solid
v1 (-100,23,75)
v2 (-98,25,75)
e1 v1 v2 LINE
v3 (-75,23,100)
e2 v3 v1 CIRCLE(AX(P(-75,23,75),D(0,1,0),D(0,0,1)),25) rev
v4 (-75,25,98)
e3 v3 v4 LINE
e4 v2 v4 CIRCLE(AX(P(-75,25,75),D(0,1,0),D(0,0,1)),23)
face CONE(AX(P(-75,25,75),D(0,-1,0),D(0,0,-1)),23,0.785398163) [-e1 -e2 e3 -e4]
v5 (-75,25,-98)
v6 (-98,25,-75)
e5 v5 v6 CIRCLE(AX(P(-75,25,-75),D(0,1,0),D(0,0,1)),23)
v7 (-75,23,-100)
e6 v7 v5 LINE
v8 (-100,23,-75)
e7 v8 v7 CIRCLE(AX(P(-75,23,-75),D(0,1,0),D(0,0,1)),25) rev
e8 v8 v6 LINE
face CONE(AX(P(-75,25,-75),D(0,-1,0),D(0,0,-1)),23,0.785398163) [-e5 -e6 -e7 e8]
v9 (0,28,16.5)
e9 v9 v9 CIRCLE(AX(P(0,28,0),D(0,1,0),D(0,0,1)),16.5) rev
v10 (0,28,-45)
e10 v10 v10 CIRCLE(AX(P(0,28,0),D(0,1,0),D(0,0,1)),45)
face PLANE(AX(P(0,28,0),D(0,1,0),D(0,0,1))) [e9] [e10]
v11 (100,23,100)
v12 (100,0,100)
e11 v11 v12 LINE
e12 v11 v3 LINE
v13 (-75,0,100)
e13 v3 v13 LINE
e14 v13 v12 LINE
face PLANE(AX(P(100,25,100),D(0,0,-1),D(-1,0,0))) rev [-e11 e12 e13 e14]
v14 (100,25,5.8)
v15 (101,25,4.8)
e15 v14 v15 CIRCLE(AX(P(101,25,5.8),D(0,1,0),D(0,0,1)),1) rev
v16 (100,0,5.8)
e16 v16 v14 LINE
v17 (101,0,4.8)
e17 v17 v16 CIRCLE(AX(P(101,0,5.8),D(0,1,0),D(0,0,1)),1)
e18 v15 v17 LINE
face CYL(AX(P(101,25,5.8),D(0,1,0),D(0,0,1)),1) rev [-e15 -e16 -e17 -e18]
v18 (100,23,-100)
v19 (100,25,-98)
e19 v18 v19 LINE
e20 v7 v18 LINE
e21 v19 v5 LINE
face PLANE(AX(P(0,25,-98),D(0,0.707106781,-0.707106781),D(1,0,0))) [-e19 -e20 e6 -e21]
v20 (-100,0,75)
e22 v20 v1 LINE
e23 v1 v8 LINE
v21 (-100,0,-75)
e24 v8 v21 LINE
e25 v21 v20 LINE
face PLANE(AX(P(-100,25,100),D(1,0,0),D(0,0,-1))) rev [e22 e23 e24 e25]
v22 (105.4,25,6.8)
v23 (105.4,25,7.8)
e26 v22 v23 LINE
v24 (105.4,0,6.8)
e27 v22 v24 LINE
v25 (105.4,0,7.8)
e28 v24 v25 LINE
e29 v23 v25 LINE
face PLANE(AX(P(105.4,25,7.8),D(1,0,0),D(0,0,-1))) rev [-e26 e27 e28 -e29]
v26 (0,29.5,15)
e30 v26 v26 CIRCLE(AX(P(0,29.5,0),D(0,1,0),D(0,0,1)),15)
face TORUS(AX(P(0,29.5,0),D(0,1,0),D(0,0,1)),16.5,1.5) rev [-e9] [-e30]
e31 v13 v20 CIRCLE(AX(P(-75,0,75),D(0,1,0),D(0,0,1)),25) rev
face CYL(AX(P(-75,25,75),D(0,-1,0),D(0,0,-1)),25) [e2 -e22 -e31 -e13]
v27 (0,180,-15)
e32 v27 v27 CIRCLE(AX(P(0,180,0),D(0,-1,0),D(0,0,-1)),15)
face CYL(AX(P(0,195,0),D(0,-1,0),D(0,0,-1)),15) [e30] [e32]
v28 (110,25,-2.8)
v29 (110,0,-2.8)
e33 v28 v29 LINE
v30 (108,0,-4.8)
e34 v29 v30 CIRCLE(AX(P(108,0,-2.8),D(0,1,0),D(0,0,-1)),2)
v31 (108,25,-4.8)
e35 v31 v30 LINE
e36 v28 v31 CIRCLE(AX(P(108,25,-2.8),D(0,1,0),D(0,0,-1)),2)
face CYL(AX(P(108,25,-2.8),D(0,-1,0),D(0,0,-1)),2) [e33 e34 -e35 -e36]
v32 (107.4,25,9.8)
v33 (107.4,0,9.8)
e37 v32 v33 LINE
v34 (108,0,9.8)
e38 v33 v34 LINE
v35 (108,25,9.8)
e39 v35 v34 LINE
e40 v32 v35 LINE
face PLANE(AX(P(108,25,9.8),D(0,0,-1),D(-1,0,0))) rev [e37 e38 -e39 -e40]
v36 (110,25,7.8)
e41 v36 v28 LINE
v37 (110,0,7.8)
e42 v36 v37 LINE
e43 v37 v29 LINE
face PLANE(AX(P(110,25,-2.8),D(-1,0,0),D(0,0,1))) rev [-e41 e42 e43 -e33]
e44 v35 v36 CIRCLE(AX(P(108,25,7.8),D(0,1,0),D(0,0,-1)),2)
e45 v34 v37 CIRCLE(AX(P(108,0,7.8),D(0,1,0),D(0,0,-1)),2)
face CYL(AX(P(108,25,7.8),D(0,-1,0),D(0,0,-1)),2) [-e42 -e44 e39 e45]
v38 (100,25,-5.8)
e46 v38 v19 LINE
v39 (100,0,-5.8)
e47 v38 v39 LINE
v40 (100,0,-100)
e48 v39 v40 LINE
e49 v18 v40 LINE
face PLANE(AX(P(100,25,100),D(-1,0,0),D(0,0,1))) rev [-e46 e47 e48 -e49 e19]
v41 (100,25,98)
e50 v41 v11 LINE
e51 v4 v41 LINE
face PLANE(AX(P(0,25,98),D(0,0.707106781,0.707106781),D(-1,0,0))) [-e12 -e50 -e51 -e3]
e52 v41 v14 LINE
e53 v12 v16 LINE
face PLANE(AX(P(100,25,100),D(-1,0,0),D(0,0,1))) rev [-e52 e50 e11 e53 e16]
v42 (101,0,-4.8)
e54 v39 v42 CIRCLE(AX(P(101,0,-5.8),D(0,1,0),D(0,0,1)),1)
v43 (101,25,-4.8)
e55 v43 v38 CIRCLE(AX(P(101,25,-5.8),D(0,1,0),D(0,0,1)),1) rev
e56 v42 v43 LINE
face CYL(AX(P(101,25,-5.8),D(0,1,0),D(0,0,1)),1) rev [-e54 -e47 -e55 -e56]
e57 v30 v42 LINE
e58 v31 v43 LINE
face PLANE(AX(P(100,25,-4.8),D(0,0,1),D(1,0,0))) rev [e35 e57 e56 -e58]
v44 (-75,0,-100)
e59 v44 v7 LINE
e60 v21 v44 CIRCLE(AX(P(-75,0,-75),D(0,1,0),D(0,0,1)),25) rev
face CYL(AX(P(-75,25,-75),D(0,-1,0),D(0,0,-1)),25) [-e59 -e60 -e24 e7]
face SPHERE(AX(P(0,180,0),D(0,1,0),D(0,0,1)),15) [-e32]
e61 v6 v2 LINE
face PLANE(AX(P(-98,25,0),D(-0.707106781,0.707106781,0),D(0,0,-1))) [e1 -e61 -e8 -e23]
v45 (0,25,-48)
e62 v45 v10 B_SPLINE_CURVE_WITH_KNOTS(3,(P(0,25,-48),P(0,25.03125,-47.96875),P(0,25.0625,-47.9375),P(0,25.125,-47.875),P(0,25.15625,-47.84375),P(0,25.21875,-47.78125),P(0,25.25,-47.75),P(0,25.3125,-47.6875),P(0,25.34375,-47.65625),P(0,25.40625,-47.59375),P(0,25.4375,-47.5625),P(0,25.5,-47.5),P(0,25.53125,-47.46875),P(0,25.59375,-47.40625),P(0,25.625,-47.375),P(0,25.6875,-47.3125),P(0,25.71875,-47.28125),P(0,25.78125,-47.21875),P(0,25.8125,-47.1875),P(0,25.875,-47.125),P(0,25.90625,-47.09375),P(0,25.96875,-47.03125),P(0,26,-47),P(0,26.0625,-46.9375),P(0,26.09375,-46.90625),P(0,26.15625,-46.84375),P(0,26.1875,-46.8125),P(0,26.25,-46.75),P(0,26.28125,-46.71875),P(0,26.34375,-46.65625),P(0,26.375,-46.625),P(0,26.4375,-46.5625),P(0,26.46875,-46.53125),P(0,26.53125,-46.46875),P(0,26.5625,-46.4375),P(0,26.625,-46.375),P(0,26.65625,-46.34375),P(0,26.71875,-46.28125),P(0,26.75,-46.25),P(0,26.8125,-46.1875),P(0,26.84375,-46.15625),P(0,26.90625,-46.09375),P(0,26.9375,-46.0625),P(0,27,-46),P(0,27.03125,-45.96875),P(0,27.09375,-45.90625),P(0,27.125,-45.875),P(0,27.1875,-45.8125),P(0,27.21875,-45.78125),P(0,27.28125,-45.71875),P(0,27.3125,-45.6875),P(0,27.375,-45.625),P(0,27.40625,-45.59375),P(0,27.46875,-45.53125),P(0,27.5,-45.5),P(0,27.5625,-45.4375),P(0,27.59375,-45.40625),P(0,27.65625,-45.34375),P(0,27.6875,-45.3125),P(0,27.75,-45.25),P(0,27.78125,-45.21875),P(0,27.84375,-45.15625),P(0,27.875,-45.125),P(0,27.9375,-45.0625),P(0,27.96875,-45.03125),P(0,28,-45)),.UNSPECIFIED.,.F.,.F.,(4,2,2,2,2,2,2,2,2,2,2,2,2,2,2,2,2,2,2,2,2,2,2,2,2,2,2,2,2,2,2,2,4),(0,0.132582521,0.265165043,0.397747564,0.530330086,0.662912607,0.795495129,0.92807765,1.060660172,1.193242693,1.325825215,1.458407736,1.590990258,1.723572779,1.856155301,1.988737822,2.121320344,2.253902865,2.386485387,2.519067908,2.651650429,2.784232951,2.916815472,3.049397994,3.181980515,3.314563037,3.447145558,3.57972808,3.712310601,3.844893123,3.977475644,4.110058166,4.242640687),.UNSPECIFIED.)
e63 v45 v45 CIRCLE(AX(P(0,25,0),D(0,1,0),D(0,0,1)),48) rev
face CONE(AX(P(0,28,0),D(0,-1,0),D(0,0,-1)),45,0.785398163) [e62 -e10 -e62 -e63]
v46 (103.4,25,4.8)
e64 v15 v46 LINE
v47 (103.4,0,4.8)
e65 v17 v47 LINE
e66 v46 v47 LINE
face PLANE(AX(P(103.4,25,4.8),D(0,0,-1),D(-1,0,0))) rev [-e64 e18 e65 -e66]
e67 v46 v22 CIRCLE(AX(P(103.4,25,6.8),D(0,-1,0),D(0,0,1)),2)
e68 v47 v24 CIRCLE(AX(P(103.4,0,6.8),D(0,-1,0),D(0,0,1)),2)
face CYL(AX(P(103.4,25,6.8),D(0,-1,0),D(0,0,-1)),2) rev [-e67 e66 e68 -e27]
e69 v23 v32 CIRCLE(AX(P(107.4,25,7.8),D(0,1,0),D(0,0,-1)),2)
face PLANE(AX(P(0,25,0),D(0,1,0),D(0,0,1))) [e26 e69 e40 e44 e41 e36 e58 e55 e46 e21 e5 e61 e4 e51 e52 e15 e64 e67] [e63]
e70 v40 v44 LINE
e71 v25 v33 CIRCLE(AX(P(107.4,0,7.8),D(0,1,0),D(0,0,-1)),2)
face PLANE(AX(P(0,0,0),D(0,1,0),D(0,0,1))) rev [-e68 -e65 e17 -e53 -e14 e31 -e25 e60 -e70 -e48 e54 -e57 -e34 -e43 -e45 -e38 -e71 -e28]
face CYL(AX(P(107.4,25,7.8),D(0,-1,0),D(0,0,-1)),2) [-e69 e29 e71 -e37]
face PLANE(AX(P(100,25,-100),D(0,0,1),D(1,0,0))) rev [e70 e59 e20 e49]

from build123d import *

# Parameters (mm, degrees)
SKETCH1_W           = 200
SKETCH1_H           = 200
BOSS_EXTRUDE1_DEPTH = 25
SKETCH2_R           = 15
BOSS_EXTRUDE2_DEPTH = 170
BOSS_EXTRUDE3_DEPTH = 25
FILLET1_R           = 1
FILLET2_R           = 25
FILLET3_R           = 15
SKETCH5_R           = 45
BOSS_EXTRUDE4_DEPTH = 3
CHAMFER1_SIZE       = 3
FILLET4_R           = 1.5
CHAMFER2_SIZE       = 2


with BuildPart() as part:
    # Sketch1 → Boss-Extrude1 (new body)
    with BuildSketch(Plane(origin=(0, 0, 0), x_dir=(1, 0, 0), z_dir=(0, 1, 0))):
        Rectangle(SKETCH1_W, SKETCH1_H)
    extrude(amount=BOSS_EXTRUDE1_DEPTH)

    # Sketch2 → Boss-Extrude2 (add)
    with BuildSketch(Plane(origin=(0, 25, 0), x_dir=(1, 0, 0), z_dir=(0, 1, 0))):
        with Locations(Location((0, 0, 0), (0, 0, 270))):
            Circle(SKETCH2_R)
    extrude(amount=BOSS_EXTRUDE2_DEPTH)

    # Sketch4 → Boss-Extrude3 (add)
    with BuildSketch(Plane(origin=(0, 0, 0), x_dir=(1, 0, 0), z_dir=(0, 1, 0))):
        with BuildLine():
            Line((100, 4.8), (108, 4.8))
            ThreePointArc((108, 4.8), (109.414213562, 4.214213562), (110, 2.8))
            Line((110, 2.8), (110, -7.8))
            ThreePointArc((110, -7.8), (109.414213562, -9.214213562), (108, -9.8))
            Line((108, -9.8), (107.4, -9.8))
            ThreePointArc((107.4, -9.8), (105.985786438, -9.214213562), (105.4, -7.8))
            Line((105.4, -7.8), (105.4, -6.8))
            ThreePointArc((105.4, -6.8), (104.814213562, -5.385786438), (103.4, -4.8))
            Line((103.4, -4.8), (100, -4.8))
            Line((100, -4.8), (100, 4.8))
        make_face()
    extrude(amount=BOSS_EXTRUDE3_DEPTH)

    # Fillet1
    fillet1_edges = [part.edges().sort_by_distance(p)[0] for p in [
        (100, 12.5, -4.8),
        (100, 12.5, 4.8),
    ]]
    fillet(fillet1_edges, radius=FILLET1_R)

    # Fillet2
    fillet2_edges = [part.edges().sort_by_distance(p)[0] for p in [
        (-100, 12.5, -100),
        (-100, 12.5, 100),
    ]]
    fillet(fillet2_edges, radius=FILLET2_R)

    # Fillet3
    fillet3_edges = [part.edges().sort_by_distance(p)[0] for p in [
        (0, 195, -15),
    ]]
    fillet(fillet3_edges, radius=FILLET3_R)

    # Sketch5 → Boss-Extrude4 (add)
    with BuildSketch(Plane(origin=(0, 25, 0), x_dir=(1, 0, 0), z_dir=(0, 1, 0))):
        with Locations(Location((0, 0, 0), (0, 0, 270))):
            Circle(SKETCH5_R)
    extrude(amount=BOSS_EXTRUDE4_DEPTH)

    # Chamfer1
    chamfer1_edges = [part.edges().sort_by_distance(p)[0] for p in [
        (0, 25, -45),
    ]]
    chamfer(chamfer1_edges, length=CHAMFER1_SIZE - 0.0001)  # a hair under: the kernel refuses the full size

    # Fillet4
    fillet4_edges = [part.edges().sort_by_distance(p)[0] for p in [
        (0, 28, -15),
    ]]
    fillet(fillet4_edges, radius=FILLET4_R)

    # Chamfer2
    chamfer2_edges = [part.edges().sort_by_distance(p)[0] for p in [
        (12.5, 25, -100),
        (-100, 25, 0),
        (12.5, 25, 100),
        (-92.67766953, 25, 92.67766953),
        (-92.67766953, 25, -92.67766953),
    ]]
    chamfer(chamfer2_edges, length=CHAMFER2_SIZE)


solid = part.part
